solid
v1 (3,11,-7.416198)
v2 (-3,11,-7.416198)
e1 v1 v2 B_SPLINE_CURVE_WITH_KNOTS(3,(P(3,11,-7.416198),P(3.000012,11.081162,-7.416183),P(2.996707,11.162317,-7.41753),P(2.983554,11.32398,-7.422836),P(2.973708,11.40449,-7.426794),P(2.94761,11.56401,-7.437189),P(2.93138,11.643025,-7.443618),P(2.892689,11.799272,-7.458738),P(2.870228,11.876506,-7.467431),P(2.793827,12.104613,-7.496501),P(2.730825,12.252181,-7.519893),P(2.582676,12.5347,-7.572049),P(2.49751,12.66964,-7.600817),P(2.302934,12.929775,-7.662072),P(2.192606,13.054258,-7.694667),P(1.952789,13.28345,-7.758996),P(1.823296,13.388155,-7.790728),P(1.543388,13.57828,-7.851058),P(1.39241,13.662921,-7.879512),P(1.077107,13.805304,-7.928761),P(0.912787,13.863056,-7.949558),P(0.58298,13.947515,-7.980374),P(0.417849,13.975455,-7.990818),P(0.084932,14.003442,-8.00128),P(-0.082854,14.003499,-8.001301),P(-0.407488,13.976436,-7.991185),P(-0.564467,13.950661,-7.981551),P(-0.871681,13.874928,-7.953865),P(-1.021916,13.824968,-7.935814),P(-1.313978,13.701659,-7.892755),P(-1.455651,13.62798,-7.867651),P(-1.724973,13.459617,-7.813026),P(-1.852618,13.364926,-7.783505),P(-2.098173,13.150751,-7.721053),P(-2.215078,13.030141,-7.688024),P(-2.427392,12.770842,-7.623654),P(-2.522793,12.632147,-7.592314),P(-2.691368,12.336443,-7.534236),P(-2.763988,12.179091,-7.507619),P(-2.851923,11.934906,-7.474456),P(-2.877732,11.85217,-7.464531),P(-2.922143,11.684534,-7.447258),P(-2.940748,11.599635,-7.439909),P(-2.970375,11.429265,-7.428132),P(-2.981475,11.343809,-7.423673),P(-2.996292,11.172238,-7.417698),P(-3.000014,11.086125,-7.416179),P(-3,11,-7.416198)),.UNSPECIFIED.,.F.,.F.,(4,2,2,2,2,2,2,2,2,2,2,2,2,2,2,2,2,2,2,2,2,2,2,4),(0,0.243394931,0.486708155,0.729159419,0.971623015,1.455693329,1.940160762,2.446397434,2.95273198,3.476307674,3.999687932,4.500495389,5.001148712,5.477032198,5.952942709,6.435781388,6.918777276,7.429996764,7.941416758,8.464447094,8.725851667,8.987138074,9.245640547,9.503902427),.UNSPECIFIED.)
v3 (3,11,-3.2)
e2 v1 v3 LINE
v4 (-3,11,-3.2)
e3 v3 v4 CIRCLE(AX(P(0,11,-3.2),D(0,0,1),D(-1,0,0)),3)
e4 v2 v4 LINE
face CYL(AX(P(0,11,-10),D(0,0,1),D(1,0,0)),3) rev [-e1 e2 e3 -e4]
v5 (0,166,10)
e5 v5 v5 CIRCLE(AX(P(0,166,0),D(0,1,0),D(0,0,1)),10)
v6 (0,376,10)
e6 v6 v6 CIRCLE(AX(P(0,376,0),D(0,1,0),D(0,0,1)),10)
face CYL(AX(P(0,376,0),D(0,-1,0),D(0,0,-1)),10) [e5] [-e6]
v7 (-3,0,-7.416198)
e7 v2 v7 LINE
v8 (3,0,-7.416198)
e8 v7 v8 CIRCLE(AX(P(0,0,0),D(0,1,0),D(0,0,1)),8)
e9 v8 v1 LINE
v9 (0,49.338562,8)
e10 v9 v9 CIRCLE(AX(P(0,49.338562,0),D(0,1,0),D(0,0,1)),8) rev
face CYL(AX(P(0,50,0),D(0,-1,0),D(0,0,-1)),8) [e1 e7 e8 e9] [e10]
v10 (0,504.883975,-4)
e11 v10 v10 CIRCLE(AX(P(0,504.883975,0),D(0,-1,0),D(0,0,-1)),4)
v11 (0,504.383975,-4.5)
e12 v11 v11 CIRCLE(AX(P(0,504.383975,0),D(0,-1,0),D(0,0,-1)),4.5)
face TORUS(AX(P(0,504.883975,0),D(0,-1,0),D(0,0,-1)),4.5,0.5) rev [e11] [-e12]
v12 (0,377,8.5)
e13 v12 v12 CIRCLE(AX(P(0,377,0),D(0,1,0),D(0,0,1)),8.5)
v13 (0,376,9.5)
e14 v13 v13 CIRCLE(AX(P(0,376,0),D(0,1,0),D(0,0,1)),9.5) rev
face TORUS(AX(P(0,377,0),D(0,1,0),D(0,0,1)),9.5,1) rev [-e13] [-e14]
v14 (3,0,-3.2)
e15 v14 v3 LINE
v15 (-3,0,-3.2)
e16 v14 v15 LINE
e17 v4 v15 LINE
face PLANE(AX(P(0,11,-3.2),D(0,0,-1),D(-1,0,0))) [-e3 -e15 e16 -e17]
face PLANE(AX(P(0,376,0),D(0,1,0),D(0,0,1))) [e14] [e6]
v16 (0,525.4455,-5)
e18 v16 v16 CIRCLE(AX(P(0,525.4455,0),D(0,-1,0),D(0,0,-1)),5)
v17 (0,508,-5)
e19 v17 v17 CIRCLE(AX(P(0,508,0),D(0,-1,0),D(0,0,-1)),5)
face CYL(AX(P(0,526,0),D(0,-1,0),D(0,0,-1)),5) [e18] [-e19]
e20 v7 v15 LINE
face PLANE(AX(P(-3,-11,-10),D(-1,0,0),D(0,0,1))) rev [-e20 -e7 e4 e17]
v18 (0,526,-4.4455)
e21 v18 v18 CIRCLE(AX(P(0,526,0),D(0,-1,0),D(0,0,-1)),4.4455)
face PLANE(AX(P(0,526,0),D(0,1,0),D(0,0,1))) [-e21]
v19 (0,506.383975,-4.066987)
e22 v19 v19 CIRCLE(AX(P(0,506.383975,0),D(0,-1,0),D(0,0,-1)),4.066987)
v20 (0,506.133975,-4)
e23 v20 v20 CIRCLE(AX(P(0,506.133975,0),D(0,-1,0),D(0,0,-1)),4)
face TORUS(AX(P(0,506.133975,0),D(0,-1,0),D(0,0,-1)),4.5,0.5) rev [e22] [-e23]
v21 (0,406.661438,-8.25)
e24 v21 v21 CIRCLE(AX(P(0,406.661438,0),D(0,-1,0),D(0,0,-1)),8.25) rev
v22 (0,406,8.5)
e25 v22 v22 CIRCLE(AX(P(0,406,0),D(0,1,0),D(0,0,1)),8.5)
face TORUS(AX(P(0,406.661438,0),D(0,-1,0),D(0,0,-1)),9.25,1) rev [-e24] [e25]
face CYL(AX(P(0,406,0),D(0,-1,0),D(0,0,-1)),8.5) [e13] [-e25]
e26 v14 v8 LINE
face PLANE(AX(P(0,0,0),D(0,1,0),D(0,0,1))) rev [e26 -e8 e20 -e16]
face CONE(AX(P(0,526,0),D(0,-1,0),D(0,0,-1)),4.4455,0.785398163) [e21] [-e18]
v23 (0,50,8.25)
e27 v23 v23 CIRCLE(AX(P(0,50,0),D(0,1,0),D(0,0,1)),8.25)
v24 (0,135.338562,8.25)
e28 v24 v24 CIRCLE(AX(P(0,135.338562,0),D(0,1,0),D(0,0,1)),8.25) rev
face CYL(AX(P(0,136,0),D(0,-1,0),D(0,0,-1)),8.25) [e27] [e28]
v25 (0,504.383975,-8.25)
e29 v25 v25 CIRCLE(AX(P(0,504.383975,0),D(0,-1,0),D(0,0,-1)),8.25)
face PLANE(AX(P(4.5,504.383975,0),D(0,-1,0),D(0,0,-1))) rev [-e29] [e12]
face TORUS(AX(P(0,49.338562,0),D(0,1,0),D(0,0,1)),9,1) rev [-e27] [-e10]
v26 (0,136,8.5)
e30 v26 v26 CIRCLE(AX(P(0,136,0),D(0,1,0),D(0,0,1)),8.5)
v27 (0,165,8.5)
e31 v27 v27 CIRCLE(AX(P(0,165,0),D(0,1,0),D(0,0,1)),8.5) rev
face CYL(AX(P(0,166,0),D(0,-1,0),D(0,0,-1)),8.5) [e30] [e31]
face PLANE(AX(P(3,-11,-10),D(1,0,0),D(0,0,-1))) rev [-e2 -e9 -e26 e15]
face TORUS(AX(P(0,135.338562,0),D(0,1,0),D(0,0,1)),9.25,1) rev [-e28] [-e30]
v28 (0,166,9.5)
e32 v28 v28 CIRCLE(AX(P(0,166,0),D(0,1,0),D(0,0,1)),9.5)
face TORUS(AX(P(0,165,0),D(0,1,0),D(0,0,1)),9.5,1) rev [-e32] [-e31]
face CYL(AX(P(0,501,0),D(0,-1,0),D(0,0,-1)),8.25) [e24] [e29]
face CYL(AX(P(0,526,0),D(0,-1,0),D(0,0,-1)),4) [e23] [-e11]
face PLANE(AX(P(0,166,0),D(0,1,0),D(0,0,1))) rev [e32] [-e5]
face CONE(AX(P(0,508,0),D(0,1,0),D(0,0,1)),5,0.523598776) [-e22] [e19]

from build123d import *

# Parameters (mm, degrees)
SKETCH1_R           = 8
BOSS_EXTRUDE1_DEPTH = 50
SKETCH2_R           = 8.25
BOSS_EXTRUDE2_DEPTH = 86
SKETCH3_R           = 8.5
BOSS_EXTRUDE3_DEPTH = 30
SKETCH4_R           = 10
BOSS_EXTRUDE4_DEPTH = 210
SKETCH5_R           = 8.5
BOSS_EXTRUDE5_DEPTH = 30
SKETCH6_R           = 8.25
BOSS_EXTRUDE6_DEPTH = 95
SKETCH32_R          = 8.25
BOSS_EXTRUDE7_DEPTH = 25
CUT_EXTRUDE1_START  = -3.2
CUT_EXTRUDE1_DEPTH  = 523.990079724
FILLET1_R           = 1


# Read off the part's stored shape, not the designer's step: M10x1.0 Machine Threads Stud1
with BuildPart() as part:
    # Sketch1 → Boss-Extrude1 (new body)
    with BuildSketch(Plane(origin=(0, 0, 0), x_dir=(1, 0, 0), z_dir=(0, 1, 0))):
        with Locations(Location((0, 0, 0), (0, 0, 270))):
            Circle(SKETCH1_R)
    extrude(amount=BOSS_EXTRUDE1_DEPTH)

    # Sketch2 → Boss-Extrude2 (add)
    with BuildSketch(Plane(origin=(0, 50, 0), x_dir=(1, 0, 0), z_dir=(0, 1, 0))):
        with Locations(Location((0, 0, 0), (0, 0, 270))):
            Circle(SKETCH2_R)
    extrude(amount=BOSS_EXTRUDE2_DEPTH)

    # Sketch3 → Boss-Extrude3 (add)
    with BuildSketch(Plane(origin=(0, 136, 0), x_dir=(1, 0, 0), z_dir=(0, 1, 0))):
        with Locations(Location((0, 0, 0), (0, 0, 270))):
            Circle(SKETCH3_R)
    extrude(amount=BOSS_EXTRUDE3_DEPTH)

    # Sketch4 → Boss-Extrude4 (add)
    with BuildSketch(Plane(origin=(0, 166, 0), x_dir=(1, 0, 0), z_dir=(0, 1, 0))):
        with Locations(Location((0, 0, 0), (0, 0, 270))):
            Circle(SKETCH4_R)
    extrude(amount=BOSS_EXTRUDE4_DEPTH)

    # Sketch5 → Boss-Extrude5 (add)
    with BuildSketch(Plane(origin=(0, 376, 0), x_dir=(1, 0, 0), z_dir=(0, 1, 0))):
        with Locations(Location((0, 0, 0), (0, 0, 270))):
            Circle(SKETCH5_R)
    extrude(amount=BOSS_EXTRUDE5_DEPTH)

    # Sketch6 → Boss-Extrude6 (add)
    with BuildSketch(Plane(origin=(0, 406, 0), x_dir=(1, 0, 0), z_dir=(0, 1, 0))):
        with Locations(Location((0, 0, 0), (0, 0, 270))):
            Circle(SKETCH6_R)
    extrude(amount=BOSS_EXTRUDE6_DEPTH)

    # Sketch32 → Boss-Extrude7 (add)
    with BuildSketch(Plane(origin=(0, 501, 0), x_dir=(1, 0, 0), z_dir=(0, 1, 0))):
        with Locations(Location((0, 0, 0), (0, 0, 270))):
            Circle(SKETCH32_R)
    extrude(amount=BOSS_EXTRUDE7_DEPTH)

    # M10x1.0 Machine Threads Stud1 outline → M10x1.0 Machine Threads Stud1 (revolve, cut)
    with BuildSketch(Plane.XY):
        with BuildLine():
            Line((8.25, 526), (4.4455, 526))
            Line((4.4455, 526), (5, 525.4455))
            Line((5, 525.4455), (5, 508))
            Line((5, 508), (4.066987298, 506.383974596))
            ThreePointArc((4.066987298, 506.383974596), (4.017037087, 506.263384119), (4, 506.133974596))
            Line((4, 506.133974596), (4, 504.883974596))
            ThreePointArc((4, 504.883974596), (4.14644661, 504.530421205), (4.5, 504.383974596))
            Line((4.5, 504.383974596), (8.25, 504.383974596))
            Line((8.25, 504.383974596), (8.25, 526))
        make_face()
    revolve(axis=Axis((0, 0, 0), (0, 1, 0)), mode=Mode.SUBTRACT)

    # Sketch34 → Cut-Extrude1 (cut, through all)
    with BuildSketch(Plane.XY.offset(CUT_EXTRUDE1_START)):
        with BuildLine():
            Line((3, -11), (-3, -11))
            Line((-3, -11), (-3, 11))
            ThreePointArc((-3, 11), (0, 14), (3, 11))
            Line((3, 11), (3, -11))
        make_face()
    extrude(amount=-CUT_EXTRUDE1_DEPTH, mode=Mode.SUBTRACT)

    # Fillet1
    # the kernel refuses this fillet: 1 mm, written as the material it adds along each edge
    with BuildSketch(Plane(origin=(0, 376, 0), x_dir=(0, 0, 1), z_dir=(-1, 0, 0))) as fillet1_piece_1:
        with BuildLine():
            CenterArc((8.5 + FILLET1_R, FILLET1_R), FILLET1_R, 180, 90)
            Line((8.5, FILLET1_R), (8.5 - FILLET1_R * 0.02, FILLET1_R))
            Line((8.5 - FILLET1_R * 0.02, FILLET1_R), (8.5 - FILLET1_R * 0.02, -FILLET1_R * 0.02))
            Line((8.5 - FILLET1_R * 0.02, -FILLET1_R * 0.02), (8.5 + FILLET1_R, -FILLET1_R * 0.02))
            Line((8.5 + FILLET1_R, -FILLET1_R * 0.02), (8.5 + FILLET1_R, 0))
        make_face()
    revolve(axis=Axis((0, 376, 0), (0, 1, 0)))
    with BuildSketch(Plane(origin=(0, 406, 0), x_dir=(0, 0, 1), z_dir=(-1, 0, 0))) as fillet1_piece_2:
        with BuildLine():
            CenterArc((9.25, 0.661437828), FILLET1_R, 180, 41.409622109)
            Line((8.25, 0.661437828), (8.23, 0.661437828))
            Line((8.23, 0.661437828), (8.23, 0))
            Line((8.23, 0), (8.25, -0.02))
            ThreePointArc((8.25, -0.02), (8.375, -0.02), (8.485, -0.013228757))
            Line((8.485, -0.013228757), (8.5, 0))
        make_face()
    revolve(axis=Axis((0, 406, 0), (0, 1, 0)))
    with BuildSketch(Plane(origin=(0, 50, 0), x_dir=(0, 0, 1), z_dir=(-1, 0, 0))) as fillet1_piece_3:
        with BuildLine():
            CenterArc((9, -0.661437828), FILLET1_R, 138.590377891, 41.409622109)
            Line((8, -0.661437828), (7.98, -0.661437828))
            Line((7.98, -0.661437828), (7.98, 0))
            Line((7.98, 0), (8, 0.02))
            ThreePointArc((8, 0.02), (8.125, 0.02), (8.235, 0.013228757))
            Line((8.235, 0.013228757), (8.25, 0))
        make_face()
    revolve(axis=Axis((0, 50, 0), (0, 1, 0)))
    with BuildSketch(Plane(origin=(0, 136, 0), x_dir=(0, 0, 1), z_dir=(-1, 0, 0))) as fillet1_piece_4:
        with BuildLine():
            CenterArc((9.25, -0.661437828), FILLET1_R, 138.590377891, 41.409622109)
            Line((8.25, -0.661437828), (8.23, -0.661437828))
            Line((8.23, -0.661437828), (8.23, 0))
            Line((8.23, 0), (8.25, 0.02))
            ThreePointArc((8.25, 0.02), (8.375, 0.02), (8.485, 0.013228757))
            Line((8.485, 0.013228757), (8.5, 0))
        make_face()
    revolve(axis=Axis((0, 136, 0), (0, 1, 0)))
    with BuildSketch(Plane(origin=(0, 166, 0), x_dir=(0, 0, 1), z_dir=(-1, 0, 0))) as fillet1_piece_5:
        with BuildLine():
            CenterArc((8.5 + FILLET1_R, -FILLET1_R), FILLET1_R, 90, 90)
            Line((8.5, -FILLET1_R), (8.5 - FILLET1_R * 0.02, -FILLET1_R))
            Line((8.5 - FILLET1_R * 0.02, -FILLET1_R), (8.5 - FILLET1_R * 0.02, FILLET1_R * 0.02))
            Line((8.5 - FILLET1_R * 0.02, FILLET1_R * 0.02), (8.5 + FILLET1_R, FILLET1_R * 0.02))
            Line((8.5 + FILLET1_R, FILLET1_R * 0.02), (8.5 + FILLET1_R, 0))
        make_face()
    revolve(axis=Axis((0, 166, 0), (0, 1, 0)))


solid = part.part
